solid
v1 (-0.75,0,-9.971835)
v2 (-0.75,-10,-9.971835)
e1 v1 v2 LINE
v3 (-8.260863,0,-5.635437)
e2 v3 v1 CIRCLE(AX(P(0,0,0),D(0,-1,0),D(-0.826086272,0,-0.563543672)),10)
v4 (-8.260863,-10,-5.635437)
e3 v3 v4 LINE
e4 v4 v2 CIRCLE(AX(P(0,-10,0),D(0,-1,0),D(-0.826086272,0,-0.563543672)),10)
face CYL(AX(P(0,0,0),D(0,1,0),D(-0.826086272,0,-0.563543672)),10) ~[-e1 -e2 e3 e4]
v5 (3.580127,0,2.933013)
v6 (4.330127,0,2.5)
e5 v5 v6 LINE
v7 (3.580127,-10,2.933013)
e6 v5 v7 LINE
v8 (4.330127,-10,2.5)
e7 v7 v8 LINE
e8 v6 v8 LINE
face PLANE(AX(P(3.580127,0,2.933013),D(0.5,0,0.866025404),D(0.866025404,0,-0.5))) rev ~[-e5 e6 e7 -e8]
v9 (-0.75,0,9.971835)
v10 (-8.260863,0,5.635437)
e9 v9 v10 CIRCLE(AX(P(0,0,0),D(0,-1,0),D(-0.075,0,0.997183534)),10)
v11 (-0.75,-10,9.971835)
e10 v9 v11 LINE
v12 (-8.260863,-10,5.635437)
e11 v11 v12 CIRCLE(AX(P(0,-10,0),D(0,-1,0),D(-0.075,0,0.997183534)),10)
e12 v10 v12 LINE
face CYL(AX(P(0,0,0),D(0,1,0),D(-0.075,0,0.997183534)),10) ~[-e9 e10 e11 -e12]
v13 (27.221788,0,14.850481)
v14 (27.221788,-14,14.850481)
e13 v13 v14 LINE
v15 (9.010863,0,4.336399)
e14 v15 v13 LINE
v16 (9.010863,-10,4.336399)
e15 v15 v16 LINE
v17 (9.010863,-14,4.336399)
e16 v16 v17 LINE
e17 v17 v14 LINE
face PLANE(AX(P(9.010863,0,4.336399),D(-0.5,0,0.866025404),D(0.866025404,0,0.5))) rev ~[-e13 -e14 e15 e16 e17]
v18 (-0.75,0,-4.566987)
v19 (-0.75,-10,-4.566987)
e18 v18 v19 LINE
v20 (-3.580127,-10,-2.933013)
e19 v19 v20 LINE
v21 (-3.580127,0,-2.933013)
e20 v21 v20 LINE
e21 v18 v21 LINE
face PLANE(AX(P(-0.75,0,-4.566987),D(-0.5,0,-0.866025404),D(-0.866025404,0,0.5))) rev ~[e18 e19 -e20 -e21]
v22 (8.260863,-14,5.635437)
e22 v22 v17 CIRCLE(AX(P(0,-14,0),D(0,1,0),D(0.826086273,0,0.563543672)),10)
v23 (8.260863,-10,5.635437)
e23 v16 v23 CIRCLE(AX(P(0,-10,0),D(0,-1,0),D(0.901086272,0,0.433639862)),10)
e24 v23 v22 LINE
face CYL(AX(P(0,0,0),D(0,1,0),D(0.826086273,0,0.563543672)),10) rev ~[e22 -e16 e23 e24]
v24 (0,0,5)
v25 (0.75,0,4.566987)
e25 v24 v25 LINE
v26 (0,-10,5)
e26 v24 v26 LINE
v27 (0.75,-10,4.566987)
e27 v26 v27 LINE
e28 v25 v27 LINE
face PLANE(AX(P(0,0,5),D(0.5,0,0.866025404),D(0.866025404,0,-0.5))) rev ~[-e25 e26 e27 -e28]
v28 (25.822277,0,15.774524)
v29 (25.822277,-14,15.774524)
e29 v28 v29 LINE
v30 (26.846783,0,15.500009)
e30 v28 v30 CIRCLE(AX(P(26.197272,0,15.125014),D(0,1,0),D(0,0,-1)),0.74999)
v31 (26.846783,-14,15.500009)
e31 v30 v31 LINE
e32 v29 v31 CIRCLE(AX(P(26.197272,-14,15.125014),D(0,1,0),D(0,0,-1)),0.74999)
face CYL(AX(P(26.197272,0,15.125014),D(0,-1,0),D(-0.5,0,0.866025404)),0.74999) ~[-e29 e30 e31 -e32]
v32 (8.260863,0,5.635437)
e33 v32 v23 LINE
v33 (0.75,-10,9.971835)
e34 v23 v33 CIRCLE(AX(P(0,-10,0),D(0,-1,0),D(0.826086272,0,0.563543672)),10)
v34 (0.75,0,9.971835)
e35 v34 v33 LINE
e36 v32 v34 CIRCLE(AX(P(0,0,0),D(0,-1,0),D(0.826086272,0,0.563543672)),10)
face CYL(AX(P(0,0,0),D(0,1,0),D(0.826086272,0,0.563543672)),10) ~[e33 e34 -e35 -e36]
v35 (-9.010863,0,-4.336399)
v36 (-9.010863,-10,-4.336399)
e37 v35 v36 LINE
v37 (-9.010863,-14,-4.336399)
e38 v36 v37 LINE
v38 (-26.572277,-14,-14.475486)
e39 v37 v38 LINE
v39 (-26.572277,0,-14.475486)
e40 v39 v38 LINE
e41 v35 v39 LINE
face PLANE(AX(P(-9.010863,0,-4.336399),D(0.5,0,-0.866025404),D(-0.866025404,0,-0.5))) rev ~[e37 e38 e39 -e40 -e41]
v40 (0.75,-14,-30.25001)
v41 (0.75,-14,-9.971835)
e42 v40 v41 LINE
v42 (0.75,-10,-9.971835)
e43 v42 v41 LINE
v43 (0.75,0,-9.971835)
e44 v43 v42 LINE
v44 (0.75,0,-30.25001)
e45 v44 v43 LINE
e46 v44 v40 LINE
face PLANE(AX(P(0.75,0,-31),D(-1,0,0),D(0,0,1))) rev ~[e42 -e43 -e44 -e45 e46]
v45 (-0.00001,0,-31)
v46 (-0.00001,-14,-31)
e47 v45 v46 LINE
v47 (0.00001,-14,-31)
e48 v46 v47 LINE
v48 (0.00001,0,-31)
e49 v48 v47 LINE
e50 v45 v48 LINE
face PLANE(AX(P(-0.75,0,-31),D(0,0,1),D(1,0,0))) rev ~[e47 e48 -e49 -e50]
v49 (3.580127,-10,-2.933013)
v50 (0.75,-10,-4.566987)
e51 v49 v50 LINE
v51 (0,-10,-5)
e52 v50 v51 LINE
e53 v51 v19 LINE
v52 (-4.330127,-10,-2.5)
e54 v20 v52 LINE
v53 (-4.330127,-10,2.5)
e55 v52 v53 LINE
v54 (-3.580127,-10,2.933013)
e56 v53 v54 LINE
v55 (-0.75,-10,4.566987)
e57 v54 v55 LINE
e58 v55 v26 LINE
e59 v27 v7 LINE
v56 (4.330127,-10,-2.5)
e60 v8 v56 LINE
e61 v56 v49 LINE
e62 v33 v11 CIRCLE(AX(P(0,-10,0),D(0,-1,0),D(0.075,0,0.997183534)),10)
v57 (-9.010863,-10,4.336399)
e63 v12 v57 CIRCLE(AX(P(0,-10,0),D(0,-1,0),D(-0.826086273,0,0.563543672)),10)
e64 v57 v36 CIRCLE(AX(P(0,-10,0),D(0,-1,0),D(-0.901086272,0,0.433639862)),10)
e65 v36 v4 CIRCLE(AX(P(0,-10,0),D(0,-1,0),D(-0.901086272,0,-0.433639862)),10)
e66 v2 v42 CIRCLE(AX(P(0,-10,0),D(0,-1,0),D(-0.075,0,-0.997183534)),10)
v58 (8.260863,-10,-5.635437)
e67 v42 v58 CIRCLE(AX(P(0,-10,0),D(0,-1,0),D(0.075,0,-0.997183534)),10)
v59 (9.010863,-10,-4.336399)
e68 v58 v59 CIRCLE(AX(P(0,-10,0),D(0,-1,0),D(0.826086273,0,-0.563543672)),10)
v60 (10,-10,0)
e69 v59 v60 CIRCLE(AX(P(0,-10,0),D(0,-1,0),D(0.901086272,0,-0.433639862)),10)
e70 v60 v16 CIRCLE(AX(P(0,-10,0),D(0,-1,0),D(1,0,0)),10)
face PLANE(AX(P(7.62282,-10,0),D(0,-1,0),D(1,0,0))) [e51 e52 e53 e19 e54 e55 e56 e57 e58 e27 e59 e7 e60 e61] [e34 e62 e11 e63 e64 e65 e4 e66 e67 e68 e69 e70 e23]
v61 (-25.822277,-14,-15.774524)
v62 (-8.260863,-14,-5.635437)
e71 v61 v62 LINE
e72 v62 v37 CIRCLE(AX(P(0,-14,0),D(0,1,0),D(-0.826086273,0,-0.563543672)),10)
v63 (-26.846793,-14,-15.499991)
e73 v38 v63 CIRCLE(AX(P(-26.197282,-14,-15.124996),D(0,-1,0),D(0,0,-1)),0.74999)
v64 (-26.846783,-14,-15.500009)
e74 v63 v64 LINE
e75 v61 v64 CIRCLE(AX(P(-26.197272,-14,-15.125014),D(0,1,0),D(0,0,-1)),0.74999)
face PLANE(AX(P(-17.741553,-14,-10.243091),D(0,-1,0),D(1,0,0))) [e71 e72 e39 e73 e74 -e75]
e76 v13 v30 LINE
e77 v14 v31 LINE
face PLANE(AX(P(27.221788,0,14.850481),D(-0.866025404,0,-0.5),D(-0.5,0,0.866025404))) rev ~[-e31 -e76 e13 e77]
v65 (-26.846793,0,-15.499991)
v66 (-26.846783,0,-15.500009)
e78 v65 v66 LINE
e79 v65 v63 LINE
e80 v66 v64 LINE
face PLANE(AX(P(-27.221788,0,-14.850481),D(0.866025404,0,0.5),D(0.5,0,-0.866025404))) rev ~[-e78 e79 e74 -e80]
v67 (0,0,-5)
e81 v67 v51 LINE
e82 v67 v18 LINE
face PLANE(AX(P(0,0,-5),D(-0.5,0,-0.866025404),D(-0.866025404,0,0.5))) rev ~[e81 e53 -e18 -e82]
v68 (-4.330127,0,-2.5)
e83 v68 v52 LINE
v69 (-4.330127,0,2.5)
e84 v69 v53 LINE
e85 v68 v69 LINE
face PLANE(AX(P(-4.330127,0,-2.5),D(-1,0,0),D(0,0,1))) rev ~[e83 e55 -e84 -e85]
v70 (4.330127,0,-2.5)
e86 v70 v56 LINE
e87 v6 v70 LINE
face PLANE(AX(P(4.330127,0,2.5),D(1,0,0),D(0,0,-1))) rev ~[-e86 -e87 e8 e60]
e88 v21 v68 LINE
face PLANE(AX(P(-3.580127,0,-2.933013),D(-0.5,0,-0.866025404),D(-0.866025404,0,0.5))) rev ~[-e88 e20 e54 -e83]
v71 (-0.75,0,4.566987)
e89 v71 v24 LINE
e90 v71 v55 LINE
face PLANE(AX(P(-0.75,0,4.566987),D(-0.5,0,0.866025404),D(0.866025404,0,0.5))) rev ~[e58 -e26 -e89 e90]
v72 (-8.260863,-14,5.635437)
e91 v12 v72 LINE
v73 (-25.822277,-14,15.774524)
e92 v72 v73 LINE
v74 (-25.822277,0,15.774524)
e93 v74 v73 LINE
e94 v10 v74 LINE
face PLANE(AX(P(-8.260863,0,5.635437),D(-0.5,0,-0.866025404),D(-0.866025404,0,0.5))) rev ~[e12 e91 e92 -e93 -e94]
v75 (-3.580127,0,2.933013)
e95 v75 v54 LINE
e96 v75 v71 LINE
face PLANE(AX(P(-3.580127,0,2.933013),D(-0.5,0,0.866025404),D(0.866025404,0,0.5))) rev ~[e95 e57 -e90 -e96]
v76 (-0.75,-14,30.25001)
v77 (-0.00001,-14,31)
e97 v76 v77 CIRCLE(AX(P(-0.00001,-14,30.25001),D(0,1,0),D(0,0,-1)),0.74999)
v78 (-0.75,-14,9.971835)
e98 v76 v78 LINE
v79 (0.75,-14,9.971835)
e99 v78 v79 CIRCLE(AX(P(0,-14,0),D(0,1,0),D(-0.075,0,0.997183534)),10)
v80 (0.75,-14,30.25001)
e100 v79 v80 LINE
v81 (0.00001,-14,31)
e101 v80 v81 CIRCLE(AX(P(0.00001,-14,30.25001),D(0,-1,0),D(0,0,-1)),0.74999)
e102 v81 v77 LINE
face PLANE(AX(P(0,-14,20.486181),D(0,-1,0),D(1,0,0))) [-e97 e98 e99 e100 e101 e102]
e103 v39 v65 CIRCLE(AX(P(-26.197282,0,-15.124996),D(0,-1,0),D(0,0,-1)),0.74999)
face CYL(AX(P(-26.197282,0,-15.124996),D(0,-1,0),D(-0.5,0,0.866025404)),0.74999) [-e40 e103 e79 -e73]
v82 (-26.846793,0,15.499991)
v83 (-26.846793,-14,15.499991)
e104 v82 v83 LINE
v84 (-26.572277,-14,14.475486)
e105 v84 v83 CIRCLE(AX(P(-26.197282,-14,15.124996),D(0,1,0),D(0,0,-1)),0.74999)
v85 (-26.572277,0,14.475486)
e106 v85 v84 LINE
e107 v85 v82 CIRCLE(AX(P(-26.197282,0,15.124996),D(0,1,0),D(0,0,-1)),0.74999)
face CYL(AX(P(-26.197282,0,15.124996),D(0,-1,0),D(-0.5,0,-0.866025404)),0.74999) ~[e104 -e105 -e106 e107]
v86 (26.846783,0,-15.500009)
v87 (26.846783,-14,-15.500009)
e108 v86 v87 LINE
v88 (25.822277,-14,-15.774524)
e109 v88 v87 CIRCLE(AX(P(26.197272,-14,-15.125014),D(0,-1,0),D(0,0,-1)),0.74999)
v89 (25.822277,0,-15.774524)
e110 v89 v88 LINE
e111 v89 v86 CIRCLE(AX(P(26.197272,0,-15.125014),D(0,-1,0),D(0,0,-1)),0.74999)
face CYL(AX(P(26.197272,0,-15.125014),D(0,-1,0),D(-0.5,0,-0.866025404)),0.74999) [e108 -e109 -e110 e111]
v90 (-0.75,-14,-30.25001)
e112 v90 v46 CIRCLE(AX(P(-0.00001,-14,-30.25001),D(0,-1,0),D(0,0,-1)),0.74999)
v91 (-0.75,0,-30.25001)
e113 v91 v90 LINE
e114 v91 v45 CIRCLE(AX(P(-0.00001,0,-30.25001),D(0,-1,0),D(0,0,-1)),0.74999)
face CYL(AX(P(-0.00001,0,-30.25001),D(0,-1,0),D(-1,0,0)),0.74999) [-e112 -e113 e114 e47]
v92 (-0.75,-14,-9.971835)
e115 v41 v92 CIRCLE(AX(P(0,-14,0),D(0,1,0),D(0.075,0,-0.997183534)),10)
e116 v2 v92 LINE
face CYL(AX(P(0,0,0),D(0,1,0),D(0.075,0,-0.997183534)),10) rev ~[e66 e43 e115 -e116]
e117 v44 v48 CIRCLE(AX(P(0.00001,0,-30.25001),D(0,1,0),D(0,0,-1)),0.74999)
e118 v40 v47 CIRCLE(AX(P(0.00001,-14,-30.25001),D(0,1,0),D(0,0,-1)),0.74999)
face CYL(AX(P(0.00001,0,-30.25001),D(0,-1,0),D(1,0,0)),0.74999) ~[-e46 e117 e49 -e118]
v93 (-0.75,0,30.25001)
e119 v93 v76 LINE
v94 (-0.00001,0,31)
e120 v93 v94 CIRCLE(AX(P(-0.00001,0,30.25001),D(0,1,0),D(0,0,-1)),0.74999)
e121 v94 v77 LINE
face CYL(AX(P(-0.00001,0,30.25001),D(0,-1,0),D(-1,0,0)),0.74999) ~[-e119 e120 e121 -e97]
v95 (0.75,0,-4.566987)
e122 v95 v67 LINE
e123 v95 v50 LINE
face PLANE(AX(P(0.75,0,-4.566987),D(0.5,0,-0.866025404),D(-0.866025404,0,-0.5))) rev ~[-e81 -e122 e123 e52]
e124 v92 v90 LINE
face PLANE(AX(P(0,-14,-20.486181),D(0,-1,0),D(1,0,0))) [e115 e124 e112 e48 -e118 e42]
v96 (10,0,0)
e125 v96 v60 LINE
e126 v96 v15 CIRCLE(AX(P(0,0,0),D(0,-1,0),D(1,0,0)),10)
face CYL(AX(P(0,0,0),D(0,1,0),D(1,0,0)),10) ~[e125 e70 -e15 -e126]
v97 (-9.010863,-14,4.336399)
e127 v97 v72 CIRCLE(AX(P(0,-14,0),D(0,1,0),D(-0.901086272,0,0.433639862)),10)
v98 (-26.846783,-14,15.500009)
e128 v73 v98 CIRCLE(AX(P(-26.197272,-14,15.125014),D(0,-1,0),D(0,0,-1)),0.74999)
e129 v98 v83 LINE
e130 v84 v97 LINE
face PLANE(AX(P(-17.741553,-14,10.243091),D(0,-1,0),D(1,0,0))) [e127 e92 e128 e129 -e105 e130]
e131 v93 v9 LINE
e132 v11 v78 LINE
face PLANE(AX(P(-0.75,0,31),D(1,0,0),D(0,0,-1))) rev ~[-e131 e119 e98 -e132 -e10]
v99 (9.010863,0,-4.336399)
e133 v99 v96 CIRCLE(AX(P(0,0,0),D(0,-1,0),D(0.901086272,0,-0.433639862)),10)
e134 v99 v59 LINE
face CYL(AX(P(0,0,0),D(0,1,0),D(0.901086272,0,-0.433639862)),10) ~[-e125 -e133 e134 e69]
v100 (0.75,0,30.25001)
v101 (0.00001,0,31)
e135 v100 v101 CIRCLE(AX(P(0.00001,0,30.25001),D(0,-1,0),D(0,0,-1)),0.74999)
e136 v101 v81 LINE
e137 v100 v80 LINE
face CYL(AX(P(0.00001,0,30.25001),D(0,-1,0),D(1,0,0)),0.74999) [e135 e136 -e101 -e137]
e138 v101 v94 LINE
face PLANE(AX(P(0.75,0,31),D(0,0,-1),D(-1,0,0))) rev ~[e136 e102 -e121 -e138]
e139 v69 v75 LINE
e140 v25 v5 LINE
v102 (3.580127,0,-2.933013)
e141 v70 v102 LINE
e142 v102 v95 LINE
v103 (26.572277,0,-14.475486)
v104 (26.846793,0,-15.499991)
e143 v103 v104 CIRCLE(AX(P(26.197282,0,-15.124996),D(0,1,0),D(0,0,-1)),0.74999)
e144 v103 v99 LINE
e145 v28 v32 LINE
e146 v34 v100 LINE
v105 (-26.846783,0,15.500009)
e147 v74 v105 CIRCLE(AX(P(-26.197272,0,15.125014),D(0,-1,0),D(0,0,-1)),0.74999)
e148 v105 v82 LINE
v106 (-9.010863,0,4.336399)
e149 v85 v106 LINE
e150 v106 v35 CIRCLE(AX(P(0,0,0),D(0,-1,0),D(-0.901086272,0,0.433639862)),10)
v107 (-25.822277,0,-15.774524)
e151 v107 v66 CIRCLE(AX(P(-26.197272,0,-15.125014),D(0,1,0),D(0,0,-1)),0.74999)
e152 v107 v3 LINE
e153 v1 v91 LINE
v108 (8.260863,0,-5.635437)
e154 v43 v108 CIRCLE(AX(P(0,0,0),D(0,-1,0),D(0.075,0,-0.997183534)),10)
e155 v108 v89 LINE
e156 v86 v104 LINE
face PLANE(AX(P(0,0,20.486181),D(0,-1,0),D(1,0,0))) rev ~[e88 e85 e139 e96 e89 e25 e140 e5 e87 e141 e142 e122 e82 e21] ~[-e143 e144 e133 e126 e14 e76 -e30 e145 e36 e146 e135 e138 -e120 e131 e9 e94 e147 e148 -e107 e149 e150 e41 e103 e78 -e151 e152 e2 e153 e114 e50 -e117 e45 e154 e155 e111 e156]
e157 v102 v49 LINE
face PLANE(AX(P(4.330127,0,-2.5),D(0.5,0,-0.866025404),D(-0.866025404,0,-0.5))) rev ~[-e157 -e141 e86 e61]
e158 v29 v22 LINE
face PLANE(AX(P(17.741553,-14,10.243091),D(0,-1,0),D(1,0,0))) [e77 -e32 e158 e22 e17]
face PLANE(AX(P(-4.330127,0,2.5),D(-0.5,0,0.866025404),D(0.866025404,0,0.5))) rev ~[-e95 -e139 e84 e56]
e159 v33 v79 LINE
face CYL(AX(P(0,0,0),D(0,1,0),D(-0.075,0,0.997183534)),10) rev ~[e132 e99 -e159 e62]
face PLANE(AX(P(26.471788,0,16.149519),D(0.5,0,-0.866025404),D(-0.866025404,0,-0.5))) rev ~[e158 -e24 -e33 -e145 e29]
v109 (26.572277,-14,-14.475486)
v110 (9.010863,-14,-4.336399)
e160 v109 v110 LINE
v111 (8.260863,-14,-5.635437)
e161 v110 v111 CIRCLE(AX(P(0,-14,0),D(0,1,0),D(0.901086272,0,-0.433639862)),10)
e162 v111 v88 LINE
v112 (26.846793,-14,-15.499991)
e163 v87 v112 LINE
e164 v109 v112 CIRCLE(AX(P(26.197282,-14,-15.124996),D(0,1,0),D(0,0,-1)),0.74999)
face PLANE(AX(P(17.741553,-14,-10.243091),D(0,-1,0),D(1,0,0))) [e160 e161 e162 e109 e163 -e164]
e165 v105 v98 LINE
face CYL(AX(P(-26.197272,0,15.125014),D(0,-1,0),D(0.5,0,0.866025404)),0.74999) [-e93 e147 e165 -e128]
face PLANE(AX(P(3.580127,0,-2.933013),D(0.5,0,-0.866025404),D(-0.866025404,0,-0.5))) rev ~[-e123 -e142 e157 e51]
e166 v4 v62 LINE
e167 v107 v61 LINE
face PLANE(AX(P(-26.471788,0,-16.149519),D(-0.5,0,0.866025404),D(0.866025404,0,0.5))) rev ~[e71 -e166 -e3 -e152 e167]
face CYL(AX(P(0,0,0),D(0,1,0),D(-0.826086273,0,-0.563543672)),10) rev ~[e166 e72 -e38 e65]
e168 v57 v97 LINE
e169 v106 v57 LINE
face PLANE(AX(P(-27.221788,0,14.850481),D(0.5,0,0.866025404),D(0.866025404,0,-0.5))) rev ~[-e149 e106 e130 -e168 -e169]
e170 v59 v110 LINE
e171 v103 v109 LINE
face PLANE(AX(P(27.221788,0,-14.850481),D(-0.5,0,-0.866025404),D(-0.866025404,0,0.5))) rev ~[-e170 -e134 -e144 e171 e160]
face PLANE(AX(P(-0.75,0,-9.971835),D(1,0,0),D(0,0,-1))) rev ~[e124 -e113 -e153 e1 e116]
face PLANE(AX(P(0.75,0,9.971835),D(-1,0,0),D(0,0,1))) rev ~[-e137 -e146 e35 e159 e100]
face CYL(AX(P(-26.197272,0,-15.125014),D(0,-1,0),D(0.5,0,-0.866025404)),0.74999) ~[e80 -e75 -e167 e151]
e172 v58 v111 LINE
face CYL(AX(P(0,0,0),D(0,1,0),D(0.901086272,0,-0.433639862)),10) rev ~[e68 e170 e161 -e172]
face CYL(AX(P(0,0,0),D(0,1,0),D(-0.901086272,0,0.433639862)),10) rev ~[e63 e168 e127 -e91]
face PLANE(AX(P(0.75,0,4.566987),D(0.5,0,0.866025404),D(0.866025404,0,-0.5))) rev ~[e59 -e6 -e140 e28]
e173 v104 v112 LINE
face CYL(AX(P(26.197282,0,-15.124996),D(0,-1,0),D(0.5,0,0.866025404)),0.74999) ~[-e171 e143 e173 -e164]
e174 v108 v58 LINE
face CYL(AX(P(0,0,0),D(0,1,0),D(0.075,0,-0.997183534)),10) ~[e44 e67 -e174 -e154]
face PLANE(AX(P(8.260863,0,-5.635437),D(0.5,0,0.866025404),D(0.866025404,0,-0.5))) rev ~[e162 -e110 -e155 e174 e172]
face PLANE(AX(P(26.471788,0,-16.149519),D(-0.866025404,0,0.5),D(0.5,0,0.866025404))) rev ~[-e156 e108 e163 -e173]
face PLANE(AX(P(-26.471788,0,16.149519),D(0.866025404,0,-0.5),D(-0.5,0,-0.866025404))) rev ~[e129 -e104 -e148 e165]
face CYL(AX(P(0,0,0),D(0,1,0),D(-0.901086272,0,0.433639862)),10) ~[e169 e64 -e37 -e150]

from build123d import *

# Parameters (mm, degrees)
F1_DEPTH = 10
F2_DEPTH = 14
F3_R     = 0.74999


# Not quite as in the source:
# - a fillet or chamfer is up to 0.001 mm smaller than in the source, because OpenCascade refuses the exact size
# - a feature names something its author has since deleted; it is built from what else it names


with BuildPart() as f1:
    # F0 (on Front) → F1 (new body)
    with BuildSketch(Plane.XZ):
        with BuildLine():
            ThreePointArc((9.0108627247, -4.336398616), (9.7495801768, -2.22388992), (10, 0))
            ThreePointArc((10, 0), (9.7495801768, 2.22388992), (9.0108627247, 4.336398616))
            Line((9.0108627247, 4.336398616), (4.6561359474, 1.8221959388))
            ThreePointArc((4.6561359474, 1.8221959388), (4.9132819854, 0.9271785866), (5, 0))
            ThreePointArc((5, 0), (4.9132819854, -0.9271785866), (4.6561359474, -1.8221959388))
            Line((4.6561359474, -1.8221959388), (9.0108627247, -4.336398616))
        make_face()
        with BuildLine():
            Line((4.6561359474, 1.8221959388), (9.0108627247, 4.336398616))
            ThreePointArc((9.0108627247, 4.336398616), (8.6602540378, 5), (8.2608627247, 5.6354367216))
            Line((8.2608627247, 5.6354367216), (3.9061359474, 3.1212340445))
            ThreePointArc((3.9061359474, 3.1212340445), (4.1298292758, 2.8186007438), (4.3301270189, 2.5))
            ThreePointArc((4.3301270189, 2.5), (4.5058944851, 2.1672366942), (4.6561359474, 1.8221959388))
        make_face()
        with BuildLine():
            ThreePointArc((8.2608627247, -5.6354367216), (8.6602540378, -5), (9.0108627247, -4.336398616))
            Line((9.0108627247, -4.336398616), (4.6561359474, -1.8221959388))
            ThreePointArc((4.6561359474, -1.8221959388), (4.5058944851, -2.1672366942), (4.3301270189, -2.5))
            ThreePointArc((4.3301270189, -2.5), (4.1298292758, -2.8186007438), (3.9061359474, -3.1212340445))
            Line((3.9061359474, -3.1212340445), (8.2608627247, -5.6354367216))
        make_face()
        with BuildLine():
            Line((3.9061359474, 3.1212340445), (8.2608627247, 5.6354367216))
            ThreePointArc((8.2608627247, 5.6354367216), (5, 8.6602540378), (0.75, 9.9718353376))
            Line((0.75, 9.9718353376), (0.75, 4.9434299833))
            ThreePointArc((0.75, 4.9434299833), (2.5, 4.3301270189), (3.9061359474, 3.1212340445))
        make_face()
        with BuildLine():
            Line((4.3301270189, 1.6339745962), (4.6561359474, 1.8221959388))
            ThreePointArc((4.6561359474, 1.8221959388), (4.5058944851, 2.1672366942), (4.3301270189, 2.5))
            Line((4.3301270189, 2.5), (4.3301270189, 1.6339745962))
        make_face()
        with BuildLine():
            ThreePointArc((5, 0), (4.9132819854, 0.9271785866), (4.6561359474, 1.8221959388))
            Line((4.6561359474, 1.8221959388), (4.3301270189, 1.6339745962))
            Line((4.3301270189, 1.6339745962), (4.3301270189, -1.6339745962))
            Line((4.3301270189, -1.6339745962), (4.6561359474, -1.8221959388))
            ThreePointArc((4.6561359474, -1.8221959388), (4.9132819854, -0.9271785866), (5, 0))
        make_face()
        with BuildLine():
            ThreePointArc((0.75, -9.9718353376), (5, -8.6602540378), (8.2608627247, -5.6354367216))
            Line((8.2608627247, -5.6354367216), (3.9061359474, -3.1212340445))
            ThreePointArc((3.9061359474, -3.1212340445), (2.5, -4.3301270189), (0.75, -4.9434299833))
            Line((0.75, -4.9434299833), (0.75, -9.9718353376))
        make_face()
        with BuildLine():
            ThreePointArc((4.3301270189, -2.5), (4.5058944851, -2.1672366942), (4.6561359474, -1.8221959388))
            Line((4.6561359474, -1.8221959388), (4.3301270189, -1.6339745962))
            Line((4.3301270189, -1.6339745962), (4.3301270189, -2.5))
        make_face()
        with BuildLine():
            Line((0.75, 4.9434299833), (0.75, 9.9718353376))
            ThreePointArc((0.75, 9.9718353376), (0, 10), (-0.75, 9.9718353376))
            Line((-0.75, 9.9718353376), (-0.75, 4.9434299833))
            ThreePointArc((-0.75, 4.9434299833), (-0.3760652094, 4.985837438), (0, 5))
            ThreePointArc((0, 5), (0.3760652094, 4.985837438), (0.75, 4.9434299833))
        make_face()
        with BuildLine():
            Line((3.5801270189, 2.9330127019), (3.9061359474, 3.1212340445))
            ThreePointArc((3.9061359474, 3.1212340445), (2.5, 4.3301270189), (0.75, 4.9434299833))
            Line((0.75, 4.9434299833), (0.75, 4.5669872981))
            Line((0.75, 4.5669872981), (3.5801270189, 2.9330127019))
        make_face()
        with BuildLine():
            ThreePointArc((4.3301270189, 2.5), (4.1298292758, 2.8186007438), (3.9061359474, 3.1212340445))
            Line((3.9061359474, 3.1212340445), (3.5801270189, 2.9330127019))
            Line((3.5801270189, 2.9330127019), (4.3301270189, 2.5))
        make_face()
        with BuildLine():
            ThreePointArc((-0.75, -9.9718353376), (0, -10), (0.75, -9.9718353376))
            Line((0.75, -9.9718353376), (0.75, -4.9434299833))
            ThreePointArc((0.75, -4.9434299833), (0.3760652094, -4.985837438), (0, -5))
            ThreePointArc((0, -5), (-0.3760652094, -4.985837438), (-0.75, -4.9434299833))
            Line((-0.75, -4.9434299833), (-0.75, -9.9718353376))
        make_face()
        with BuildLine():
            Line((3.5801270189, -2.9330127019), (3.9061359474, -3.1212340445))
            ThreePointArc((3.9061359474, -3.1212340445), (4.1298292758, -2.8186007438), (4.3301270189, -2.5))
            Line((4.3301270189, -2.5), (3.5801270189, -2.9330127019))
        make_face()
        with BuildLine():
            ThreePointArc((0.75, -4.9434299833), (2.5, -4.3301270189), (3.9061359474, -3.1212340445))
            Line((3.9061359474, -3.1212340445), (3.5801270189, -2.9330127019))
            Line((3.5801270189, -2.9330127019), (0.75, -4.5669872981))
            Line((0.75, -4.5669872981), (0.75, -4.9434299833))
        make_face()
        with BuildLine():
            Line((-0.75, 4.9434299833), (-0.75, 9.9718353376))
            ThreePointArc((-0.75, 9.9718353376), (-5, 8.6602540378), (-8.2608627247, 5.6354367216))
            Line((-8.2608627247, 5.6354367216), (-3.9061359474, 3.1212340445))
            ThreePointArc((-3.9061359474, 3.1212340445), (-2.5, 4.3301270189), (-0.75, 4.9434299833))
        make_face()
        with BuildLine():
            Line((0.75, 4.5669872981), (0.75, 4.9434299833))
            ThreePointArc((0.75, 4.9434299833), (0.3760652094, 4.985837438), (0, 5))
            Line((0, 5), (0.75, 4.5669872981))
        make_face()
        with BuildLine():
            ThreePointArc((-8.2608627247, -5.6354367216), (-5, -8.6602540378), (-0.75, -9.9718353376))
            Line((-0.75, -9.9718353376), (-0.75, -4.9434299833))
            ThreePointArc((-0.75, -4.9434299833), (-2.5, -4.3301270189), (-3.9061359474, -3.1212340445))
            Line((-3.9061359474, -3.1212340445), (-8.2608627247, -5.6354367216))
        make_face()
        with BuildLine():
            ThreePointArc((0, -5), (0.3760652094, -4.985837438), (0.75, -4.9434299833))
            Line((0.75, -4.9434299833), (0.75, -4.5669872981))
            Line((0.75, -4.5669872981), (0, -5))
        make_face()
        with BuildLine():
            Line((-3.9061359474, 3.1212340445), (-8.2608627247, 5.6354367216))
            ThreePointArc((-8.2608627247, 5.6354367216), (-8.6602540378, 5), (-9.0108627247, 4.336398616))
            Line((-9.0108627247, 4.336398616), (-4.6561359474, 1.8221959388))
            ThreePointArc((-4.6561359474, 1.8221959388), (-4.5058944851, 2.1672366942), (-4.3301270189, 2.5))
            ThreePointArc((-4.3301270189, 2.5), (-4.1298292758, 2.8186007438), (-3.9061359474, 3.1212340445))
        make_face()
        with BuildLine():
            Line((-0.75, 4.5669872981), (-0.75, 4.9434299833))
            ThreePointArc((-0.75, 4.9434299833), (-2.5, 4.3301270189), (-3.9061359474, 3.1212340445))
            Line((-3.9061359474, 3.1212340445), (-3.5801270189, 2.9330127019))
            Line((-3.5801270189, 2.9330127019), (-0.75, 4.5669872981))
        make_face()
        with BuildLine():
            ThreePointArc((0, 5), (-0.3760652094, 4.985837438), (-0.75, 4.9434299833))
            Line((-0.75, 4.9434299833), (-0.75, 4.5669872981))
            Line((-0.75, 4.5669872981), (0, 5))
        make_face()
        with BuildLine():
            ThreePointArc((-9.0108627247, -4.336398616), (-8.6602540378, -5), (-8.2608627247, -5.6354367216))
            Line((-8.2608627247, -5.6354367216), (-3.9061359474, -3.1212340445))
            ThreePointArc((-3.9061359474, -3.1212340445), (-4.1298292758, -2.8186007438), (-4.3301270189, -2.5))
            ThreePointArc((-4.3301270189, -2.5), (-4.5058944851, -2.1672366942), (-4.6561359474, -1.8221959388))
            Line((-4.6561359474, -1.8221959388), (-9.0108627247, -4.336398616))
        make_face()
        with BuildLine():
            Line((-0.75, -4.5669872981), (-0.75, -4.9434299833))
            ThreePointArc((-0.75, -4.9434299833), (-0.3760652094, -4.985837438), (0, -5))
            Line((0, -5), (-0.75, -4.5669872981))
        make_face()
        with BuildLine():
            ThreePointArc((-3.9061359474, -3.1212340445), (-2.5, -4.3301270189), (-0.75, -4.9434299833))
            Line((-0.75, -4.9434299833), (-0.75, -4.5669872981))
            Line((-0.75, -4.5669872981), (-3.5801270189, -2.9330127019))
            Line((-3.5801270189, -2.9330127019), (-3.9061359474, -3.1212340445))
        make_face()
        with BuildLine():
            Line((-4.6561359474, 1.8221959388), (-9.0108627247, 4.336398616))
            ThreePointArc((-9.0108627247, 4.336398616), (-10, 0), (-9.0108627247, -4.336398616))
            Line((-9.0108627247, -4.336398616), (-4.6561359474, -1.8221959388))
            ThreePointArc((-4.6561359474, -1.8221959388), (-5, 0), (-4.6561359474, 1.8221959388))
        make_face()
        with BuildLine():
            Line((-3.5801270189, 2.9330127019), (-3.9061359474, 3.1212340445))
            ThreePointArc((-3.9061359474, 3.1212340445), (-4.1298292758, 2.8186007438), (-4.3301270189, 2.5))
            Line((-4.3301270189, 2.5), (-3.5801270189, 2.9330127019))
        make_face()
        with BuildLine():
            ThreePointArc((-4.3301270189, -2.5), (-4.1298292758, -2.8186007438), (-3.9061359474, -3.1212340445))
            Line((-3.9061359474, -3.1212340445), (-3.5801270189, -2.9330127019))
            Line((-3.5801270189, -2.9330127019), (-4.3301270189, -2.5))
        make_face()
        with BuildLine():
            Line((-4.3301270189, 1.6339745962), (-4.6561359474, 1.8221959388))
            ThreePointArc((-4.6561359474, 1.8221959388), (-5, 0), (-4.6561359474, -1.8221959388))
            Line((-4.6561359474, -1.8221959388), (-4.3301270189, -1.6339745962))
            Line((-4.3301270189, -1.6339745962), (-4.3301270189, 1.6339745962))
        make_face()
        with BuildLine():
            ThreePointArc((-4.3301270189, 2.5), (-4.5058944851, 2.1672366942), (-4.6561359474, 1.8221959388))
            Line((-4.6561359474, 1.8221959388), (-4.3301270189, 1.6339745962))
            Line((-4.3301270189, 1.6339745962), (-4.3301270189, 2.5))
        make_face()
        with BuildLine():
            Line((-4.3301270189, -1.6339745962), (-4.6561359474, -1.8221959388))
            ThreePointArc((-4.6561359474, -1.8221959388), (-4.5058944851, -2.1672366942), (-4.3301270189, -2.5))
            Line((-4.3301270189, -2.5), (-4.3301270189, -1.6339745962))
        make_face()
    extrude(amount=F1_DEPTH)

    # F0 (on Front) → F2 (join)
    with BuildSketch(Plane.XZ):
        with BuildLine():
            ThreePointArc((-0.75, 9.9718353376), (0, 10), (0.75, 9.9718353376))
            Line((0.75, 9.9718353376), (0.75, 31))
            Line((0.75, 31), (-0.75, 31))
            Line((-0.75, 31), (-0.75, 9.9718353376))
        make_face()
        with BuildLine():
            Line((27.2217875173, -14.8504809472), (9.0108627247, -4.336398616))
            ThreePointArc((9.0108627247, -4.336398616), (8.6602540378, -5), (8.2608627247, -5.6354367216))
            Line((8.2608627247, -5.6354367216), (26.4717875173, -16.1495190528))
            Line((26.4717875173, -16.1495190528), (27.2217875173, -14.8504809472))
        make_face()
        with BuildLine():
            ThreePointArc((8.2608627247, 5.6354367216), (8.6602540378, 5), (9.0108627247, 4.336398616))
            Line((9.0108627247, 4.336398616), (27.2217875173, 14.8504809472))
            Line((27.2217875173, 14.8504809472), (26.4717875173, 16.1495190528))
            Line((26.4717875173, 16.1495190528), (8.2608627247, 5.6354367216))
        make_face()
        with BuildLine():
            Line((0.75, -31), (0.75, -9.9718353376))
            ThreePointArc((0.75, -9.9718353376), (0, -10), (-0.75, -9.9718353376))
            Line((-0.75, -9.9718353376), (-0.75, -31))
            Line((-0.75, -31), (0.75, -31))
        make_face()
        with BuildLine():
            Line((-26.4717875173, -16.1495190528), (-8.2608627247, -5.6354367216))
            ThreePointArc((-8.2608627247, -5.6354367216), (-8.6602540378, -5), (-9.0108627247, -4.336398616))
            Line((-9.0108627247, -4.336398616), (-27.2217875173, -14.8504809472))
            Line((-27.2217875173, -14.8504809472), (-26.4717875173, -16.1495190528))
        make_face()
        with BuildLine():
            ThreePointArc((-9.0108627247, 4.336398616), (-8.6602540378, 5), (-8.2608627247, 5.6354367216))
            Line((-8.2608627247, 5.6354367216), (-26.4717875173, 16.1495190528))
            Line((-26.4717875173, 16.1495190528), (-27.2217875173, 14.8504809472))
            Line((-27.2217875173, 14.8504809472), (-9.0108627247, 4.336398616))
        make_face()
    extrude(amount=F2_DEPTH)

    # F3 (radius 0.75 in the source; OpenCascade refuses exactly that, so slightly less here)
    f3_edges = [f1.edges().sort_by_distance(p)[0] for p in [
        (26.471788, -7, 16.149519),
        (27.221788, -7, -14.850481),
        (26.471788, -7, -16.149519),
        (0.75, -7, -31),
        (-0.75, -7, -31),
        (-26.471788, -7, -16.149519),
        (-27.221788, -7, -14.850481),
        (-26.471788, -7, 16.149519),
        (-27.221788, -7, 14.850481),
        (0.75, -7, 31),
        (-0.75, -7, 31),
    ]]
    fillet(f3_edges, radius=F3_R)


solid = f1.part
